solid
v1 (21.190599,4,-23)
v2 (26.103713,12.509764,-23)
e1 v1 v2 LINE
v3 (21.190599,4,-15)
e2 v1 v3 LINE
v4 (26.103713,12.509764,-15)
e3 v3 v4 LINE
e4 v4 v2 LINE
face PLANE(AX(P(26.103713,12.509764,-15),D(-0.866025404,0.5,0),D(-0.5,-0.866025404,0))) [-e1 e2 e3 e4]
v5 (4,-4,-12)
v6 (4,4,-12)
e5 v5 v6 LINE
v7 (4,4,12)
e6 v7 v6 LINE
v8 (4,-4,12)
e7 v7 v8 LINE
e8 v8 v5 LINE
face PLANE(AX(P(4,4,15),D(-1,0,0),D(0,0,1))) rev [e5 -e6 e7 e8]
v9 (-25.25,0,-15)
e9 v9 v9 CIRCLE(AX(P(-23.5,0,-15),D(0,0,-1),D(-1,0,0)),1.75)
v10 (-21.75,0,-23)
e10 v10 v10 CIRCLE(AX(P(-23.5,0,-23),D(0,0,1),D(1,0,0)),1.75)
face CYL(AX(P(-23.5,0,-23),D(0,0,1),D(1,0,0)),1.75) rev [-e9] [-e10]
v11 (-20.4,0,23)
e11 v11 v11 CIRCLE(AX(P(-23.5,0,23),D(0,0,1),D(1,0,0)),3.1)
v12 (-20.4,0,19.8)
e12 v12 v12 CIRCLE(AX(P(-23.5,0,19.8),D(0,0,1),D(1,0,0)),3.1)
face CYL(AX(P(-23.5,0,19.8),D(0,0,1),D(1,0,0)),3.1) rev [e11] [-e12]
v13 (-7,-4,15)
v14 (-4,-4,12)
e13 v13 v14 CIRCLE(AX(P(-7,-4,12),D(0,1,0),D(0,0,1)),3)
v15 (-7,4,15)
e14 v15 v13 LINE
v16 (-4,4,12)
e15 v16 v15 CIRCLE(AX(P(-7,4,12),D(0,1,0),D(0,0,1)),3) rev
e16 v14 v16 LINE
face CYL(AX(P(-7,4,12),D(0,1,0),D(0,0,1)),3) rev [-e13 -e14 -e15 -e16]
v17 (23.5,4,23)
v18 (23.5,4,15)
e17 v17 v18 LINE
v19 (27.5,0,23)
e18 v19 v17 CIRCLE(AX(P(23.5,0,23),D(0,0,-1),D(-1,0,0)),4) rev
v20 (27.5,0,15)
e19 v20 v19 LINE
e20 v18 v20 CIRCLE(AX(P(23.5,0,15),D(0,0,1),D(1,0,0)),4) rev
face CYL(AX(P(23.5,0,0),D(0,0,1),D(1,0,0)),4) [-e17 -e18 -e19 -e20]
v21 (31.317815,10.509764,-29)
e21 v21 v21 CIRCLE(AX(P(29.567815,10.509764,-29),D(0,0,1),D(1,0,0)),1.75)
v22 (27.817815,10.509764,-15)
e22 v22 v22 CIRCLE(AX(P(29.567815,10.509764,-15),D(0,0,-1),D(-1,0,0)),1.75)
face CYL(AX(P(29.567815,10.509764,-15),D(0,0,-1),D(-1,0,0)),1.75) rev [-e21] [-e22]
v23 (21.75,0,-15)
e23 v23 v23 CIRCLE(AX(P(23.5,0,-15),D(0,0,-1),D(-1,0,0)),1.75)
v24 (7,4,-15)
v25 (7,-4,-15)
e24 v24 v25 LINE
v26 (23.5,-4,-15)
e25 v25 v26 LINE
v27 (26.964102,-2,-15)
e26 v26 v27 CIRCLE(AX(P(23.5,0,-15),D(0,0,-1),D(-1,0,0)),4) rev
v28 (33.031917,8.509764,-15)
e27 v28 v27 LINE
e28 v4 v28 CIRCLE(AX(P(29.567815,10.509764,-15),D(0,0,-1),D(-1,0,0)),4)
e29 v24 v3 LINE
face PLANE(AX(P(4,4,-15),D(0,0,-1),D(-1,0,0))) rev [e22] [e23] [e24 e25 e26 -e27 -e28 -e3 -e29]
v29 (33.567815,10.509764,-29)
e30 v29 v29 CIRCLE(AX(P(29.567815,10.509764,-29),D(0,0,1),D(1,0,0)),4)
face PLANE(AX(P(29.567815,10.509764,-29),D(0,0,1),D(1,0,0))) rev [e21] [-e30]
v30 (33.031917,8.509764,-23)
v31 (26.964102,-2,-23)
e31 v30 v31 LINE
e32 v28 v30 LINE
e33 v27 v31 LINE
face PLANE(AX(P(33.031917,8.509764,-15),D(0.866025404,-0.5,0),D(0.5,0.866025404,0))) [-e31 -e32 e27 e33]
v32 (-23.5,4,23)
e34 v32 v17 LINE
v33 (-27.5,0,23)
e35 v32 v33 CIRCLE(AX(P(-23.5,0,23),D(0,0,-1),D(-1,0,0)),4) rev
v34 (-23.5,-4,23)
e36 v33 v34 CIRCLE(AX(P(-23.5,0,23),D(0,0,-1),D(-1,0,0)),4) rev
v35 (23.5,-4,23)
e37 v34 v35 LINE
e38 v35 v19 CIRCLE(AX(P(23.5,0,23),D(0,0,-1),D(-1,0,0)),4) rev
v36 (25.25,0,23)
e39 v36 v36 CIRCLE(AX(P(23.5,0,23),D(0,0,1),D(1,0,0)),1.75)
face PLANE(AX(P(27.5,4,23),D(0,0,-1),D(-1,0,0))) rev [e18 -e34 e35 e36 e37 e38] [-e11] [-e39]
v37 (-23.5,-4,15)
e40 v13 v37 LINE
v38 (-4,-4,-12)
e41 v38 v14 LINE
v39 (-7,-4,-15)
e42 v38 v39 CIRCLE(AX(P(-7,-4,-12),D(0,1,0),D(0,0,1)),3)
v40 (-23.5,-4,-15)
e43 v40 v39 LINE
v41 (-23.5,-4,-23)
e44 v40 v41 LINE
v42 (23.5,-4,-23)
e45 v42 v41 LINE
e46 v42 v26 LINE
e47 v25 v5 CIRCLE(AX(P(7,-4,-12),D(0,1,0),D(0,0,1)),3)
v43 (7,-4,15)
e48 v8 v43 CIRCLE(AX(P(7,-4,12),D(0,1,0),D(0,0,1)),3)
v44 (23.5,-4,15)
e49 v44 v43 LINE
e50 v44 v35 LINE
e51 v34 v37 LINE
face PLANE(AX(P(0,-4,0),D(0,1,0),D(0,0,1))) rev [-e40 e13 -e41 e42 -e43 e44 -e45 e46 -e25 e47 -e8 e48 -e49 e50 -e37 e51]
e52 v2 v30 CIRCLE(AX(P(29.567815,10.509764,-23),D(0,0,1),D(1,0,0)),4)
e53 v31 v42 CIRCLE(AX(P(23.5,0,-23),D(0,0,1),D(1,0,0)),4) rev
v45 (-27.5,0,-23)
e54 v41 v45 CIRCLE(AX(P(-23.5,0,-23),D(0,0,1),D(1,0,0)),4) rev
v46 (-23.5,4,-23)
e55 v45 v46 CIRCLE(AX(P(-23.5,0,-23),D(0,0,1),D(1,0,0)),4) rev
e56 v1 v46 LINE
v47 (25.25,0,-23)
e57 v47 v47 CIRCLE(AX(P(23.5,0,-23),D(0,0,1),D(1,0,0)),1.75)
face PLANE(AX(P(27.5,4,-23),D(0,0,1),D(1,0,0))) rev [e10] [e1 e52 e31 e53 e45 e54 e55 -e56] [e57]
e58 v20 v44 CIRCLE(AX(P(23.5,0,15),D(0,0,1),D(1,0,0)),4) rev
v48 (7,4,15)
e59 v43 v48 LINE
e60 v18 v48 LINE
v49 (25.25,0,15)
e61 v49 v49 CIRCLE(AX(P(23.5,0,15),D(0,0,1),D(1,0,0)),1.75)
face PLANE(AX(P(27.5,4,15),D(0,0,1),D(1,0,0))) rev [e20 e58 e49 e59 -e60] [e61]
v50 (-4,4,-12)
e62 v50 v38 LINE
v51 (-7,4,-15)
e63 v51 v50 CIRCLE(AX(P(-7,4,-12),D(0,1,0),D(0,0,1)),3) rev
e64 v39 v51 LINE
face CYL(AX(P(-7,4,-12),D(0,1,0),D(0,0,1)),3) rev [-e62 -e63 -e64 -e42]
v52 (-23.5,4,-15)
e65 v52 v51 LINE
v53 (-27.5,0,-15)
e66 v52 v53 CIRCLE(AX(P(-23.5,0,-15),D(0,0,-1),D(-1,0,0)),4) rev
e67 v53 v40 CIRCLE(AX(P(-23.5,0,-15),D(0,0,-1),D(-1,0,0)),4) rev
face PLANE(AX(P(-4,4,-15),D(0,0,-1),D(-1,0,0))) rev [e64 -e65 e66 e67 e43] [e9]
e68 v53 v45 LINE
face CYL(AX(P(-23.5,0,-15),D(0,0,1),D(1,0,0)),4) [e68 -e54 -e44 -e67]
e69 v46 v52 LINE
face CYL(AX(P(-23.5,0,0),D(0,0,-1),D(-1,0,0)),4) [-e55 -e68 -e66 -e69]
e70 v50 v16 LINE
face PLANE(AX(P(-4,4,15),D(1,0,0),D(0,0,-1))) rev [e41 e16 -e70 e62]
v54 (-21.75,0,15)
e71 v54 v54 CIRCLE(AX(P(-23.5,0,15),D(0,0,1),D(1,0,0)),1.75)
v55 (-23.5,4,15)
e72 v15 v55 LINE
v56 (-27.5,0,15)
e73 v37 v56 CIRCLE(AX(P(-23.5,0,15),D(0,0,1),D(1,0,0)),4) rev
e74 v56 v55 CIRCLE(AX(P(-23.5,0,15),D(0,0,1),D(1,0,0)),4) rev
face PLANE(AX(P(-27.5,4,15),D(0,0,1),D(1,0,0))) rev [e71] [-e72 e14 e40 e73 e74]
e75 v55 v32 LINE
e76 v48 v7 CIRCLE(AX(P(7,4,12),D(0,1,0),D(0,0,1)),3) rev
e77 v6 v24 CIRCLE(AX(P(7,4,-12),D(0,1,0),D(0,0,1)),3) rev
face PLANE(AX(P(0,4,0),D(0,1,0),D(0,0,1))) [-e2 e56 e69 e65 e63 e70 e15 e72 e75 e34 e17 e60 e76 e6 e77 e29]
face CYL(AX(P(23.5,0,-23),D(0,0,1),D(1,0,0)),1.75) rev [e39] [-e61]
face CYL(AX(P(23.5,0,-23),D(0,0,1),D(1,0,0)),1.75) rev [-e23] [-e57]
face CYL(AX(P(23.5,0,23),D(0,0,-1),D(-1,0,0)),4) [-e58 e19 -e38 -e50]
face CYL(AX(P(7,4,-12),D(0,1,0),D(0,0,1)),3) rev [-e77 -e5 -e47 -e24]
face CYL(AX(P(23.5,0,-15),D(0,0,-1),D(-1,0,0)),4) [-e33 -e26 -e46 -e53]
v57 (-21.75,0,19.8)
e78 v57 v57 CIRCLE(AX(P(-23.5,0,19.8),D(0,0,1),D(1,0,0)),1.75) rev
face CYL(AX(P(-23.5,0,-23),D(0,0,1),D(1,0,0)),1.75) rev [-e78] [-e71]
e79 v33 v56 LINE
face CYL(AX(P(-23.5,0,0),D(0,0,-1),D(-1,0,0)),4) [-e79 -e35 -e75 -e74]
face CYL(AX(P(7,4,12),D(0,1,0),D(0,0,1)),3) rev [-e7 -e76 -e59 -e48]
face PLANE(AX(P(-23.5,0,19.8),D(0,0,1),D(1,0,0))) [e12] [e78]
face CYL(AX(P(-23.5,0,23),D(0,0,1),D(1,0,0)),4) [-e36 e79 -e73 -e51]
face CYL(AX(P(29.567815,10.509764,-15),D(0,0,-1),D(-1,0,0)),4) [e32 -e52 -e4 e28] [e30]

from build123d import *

# Parameters (mm, degrees)
SALIENTE_EXTRUIR1_DEPTH = 4
CROQUIS3_R              = 1.75
CORTAR_EXTRUIR1_DEPTH   = 54.742441329
REDONDEO8_R             = 4
REDONDEO9_R             = 3
SALIENTE_EXTRUIR3_START = -8
CROQUIS5_R              = 1.75
SALIENTE_EXTRUIR3_DEPTH = 8
CROQUIS4_R              = 4
CROQUIS4_R_2            = 1.75
SALIENTE_EXTRUIR2_DEPTH = 6
CROQUIS6_R              = 3.1
CORTAR_EXTRUIR2_DEPTH   = 3.2


with BuildPart() as part:
    # Croquis2 → Saliente-Extruir1 (new, symmetric)
    with BuildSketch(Plane(origin=(0, 0, 0), x_dir=(1, 0, 0), z_dir=(0, 1, 0))):
        Polygon((27.5, -23), (27.5, -15), (4, -15), (4, 15), (27.5, 15), (27.5, 23), (-27.5, 23), (-27.5, 15), (-4, 15), (-4, -15), (-27.5, -15), (-27.5, -23), align=None)
    extrude(amount=SALIENTE_EXTRUIR1_DEPTH, both=True)

    # Croquis3 → Cortar-Extruir1 (cut, through all)
    with BuildSketch(Plane.XY.offset(23)):
        with Locations((23.5, 0)):
            Circle(CROQUIS3_R)
        with Locations((-23.5, 0)):
            Circle(CROQUIS3_R)
    extrude(amount=-CORTAR_EXTRUIR1_DEPTH, mode=Mode.SUBTRACT)

    # Redondeo8
    redondeo8_edges = [part.edges().sort_by_distance(p)[0] for p in [
        (27.5, -4, -19),
        (27.5, 4, -19),
        (27.5, -4, 19),
        (27.5, 4, 19),
        (-27.5, -4, -19),
        (-27.5, 4, -19),
        (-27.5, -4, 19),
        (-27.5, 4, 19),
    ]]
    fillet(redondeo8_edges, radius=REDONDEO8_R - 0.0001)  # a hair under: the kernel refuses the full size

    # Redondeo9
    redondeo9_edges = [part.edges().sort_by_distance(p)[0] for p in [
        (4, 0, -15),
        (4, 0, 15),
        (-4, 0, 15),
        (-4, 0, -15),
    ]]
    fillet(redondeo9_edges, radius=REDONDEO9_R)

    # Croquis5 → Saliente-Extruir3 (add)
    with BuildSketch(Plane(origin=(0, 0, -23), x_dir=(-1, 0, 0), z_dir=(0, 0, -1)).offset(SALIENTE_EXTRUIR3_START)):
        with BuildLine():
            Line((-26.103713296, 12.509763717), (-20.035898385, 2))
            ThreePointArc((-20.035898385, 2), (-21.5, -3.464101615), (-26.964101615, -2))
            Line((-26.964101615, -2), (-33.031916526, 8.509763717))
            ThreePointArc((-33.031916526, 8.509763717), (-31.567814911, 13.973865332), (-26.103713296, 12.509763717))
        make_face()
        with Locations(Location((-23.5, 0, 0), (0, 0, 180))):
            Circle(CROQUIS5_R, mode=Mode.SUBTRACT)
        with Locations((-29.567814911, 10.509763717)):
            Circle(CROQUIS5_R, mode=Mode.SUBTRACT)
    extrude(amount=SALIENTE_EXTRUIR3_DEPTH)

    # Croquis4 → Saliente-Extruir2 (add)
    with BuildSketch(Plane.XY.offset(-23)):
        with Locations(Location((29.567814911, 10.509763717, 0), (0, 0, 150))):
            Circle(CROQUIS4_R)
        with Locations(Location((29.567814911, 10.509763717, 0), (0, 0, 180))):
            Circle(CROQUIS4_R_2, mode=Mode.SUBTRACT)
    extrude(amount=-SALIENTE_EXTRUIR2_DEPTH)

    # Croquis6 → Cortar-Extruir2 (cut)
    with BuildSketch(Plane.XY.offset(23)):
        with Locations((-23.5, 0)):
            Circle(CROQUIS6_R)
    extrude(amount=-CORTAR_EXTRUIR2_DEPTH, mode=Mode.SUBTRACT)


solid = part.part
